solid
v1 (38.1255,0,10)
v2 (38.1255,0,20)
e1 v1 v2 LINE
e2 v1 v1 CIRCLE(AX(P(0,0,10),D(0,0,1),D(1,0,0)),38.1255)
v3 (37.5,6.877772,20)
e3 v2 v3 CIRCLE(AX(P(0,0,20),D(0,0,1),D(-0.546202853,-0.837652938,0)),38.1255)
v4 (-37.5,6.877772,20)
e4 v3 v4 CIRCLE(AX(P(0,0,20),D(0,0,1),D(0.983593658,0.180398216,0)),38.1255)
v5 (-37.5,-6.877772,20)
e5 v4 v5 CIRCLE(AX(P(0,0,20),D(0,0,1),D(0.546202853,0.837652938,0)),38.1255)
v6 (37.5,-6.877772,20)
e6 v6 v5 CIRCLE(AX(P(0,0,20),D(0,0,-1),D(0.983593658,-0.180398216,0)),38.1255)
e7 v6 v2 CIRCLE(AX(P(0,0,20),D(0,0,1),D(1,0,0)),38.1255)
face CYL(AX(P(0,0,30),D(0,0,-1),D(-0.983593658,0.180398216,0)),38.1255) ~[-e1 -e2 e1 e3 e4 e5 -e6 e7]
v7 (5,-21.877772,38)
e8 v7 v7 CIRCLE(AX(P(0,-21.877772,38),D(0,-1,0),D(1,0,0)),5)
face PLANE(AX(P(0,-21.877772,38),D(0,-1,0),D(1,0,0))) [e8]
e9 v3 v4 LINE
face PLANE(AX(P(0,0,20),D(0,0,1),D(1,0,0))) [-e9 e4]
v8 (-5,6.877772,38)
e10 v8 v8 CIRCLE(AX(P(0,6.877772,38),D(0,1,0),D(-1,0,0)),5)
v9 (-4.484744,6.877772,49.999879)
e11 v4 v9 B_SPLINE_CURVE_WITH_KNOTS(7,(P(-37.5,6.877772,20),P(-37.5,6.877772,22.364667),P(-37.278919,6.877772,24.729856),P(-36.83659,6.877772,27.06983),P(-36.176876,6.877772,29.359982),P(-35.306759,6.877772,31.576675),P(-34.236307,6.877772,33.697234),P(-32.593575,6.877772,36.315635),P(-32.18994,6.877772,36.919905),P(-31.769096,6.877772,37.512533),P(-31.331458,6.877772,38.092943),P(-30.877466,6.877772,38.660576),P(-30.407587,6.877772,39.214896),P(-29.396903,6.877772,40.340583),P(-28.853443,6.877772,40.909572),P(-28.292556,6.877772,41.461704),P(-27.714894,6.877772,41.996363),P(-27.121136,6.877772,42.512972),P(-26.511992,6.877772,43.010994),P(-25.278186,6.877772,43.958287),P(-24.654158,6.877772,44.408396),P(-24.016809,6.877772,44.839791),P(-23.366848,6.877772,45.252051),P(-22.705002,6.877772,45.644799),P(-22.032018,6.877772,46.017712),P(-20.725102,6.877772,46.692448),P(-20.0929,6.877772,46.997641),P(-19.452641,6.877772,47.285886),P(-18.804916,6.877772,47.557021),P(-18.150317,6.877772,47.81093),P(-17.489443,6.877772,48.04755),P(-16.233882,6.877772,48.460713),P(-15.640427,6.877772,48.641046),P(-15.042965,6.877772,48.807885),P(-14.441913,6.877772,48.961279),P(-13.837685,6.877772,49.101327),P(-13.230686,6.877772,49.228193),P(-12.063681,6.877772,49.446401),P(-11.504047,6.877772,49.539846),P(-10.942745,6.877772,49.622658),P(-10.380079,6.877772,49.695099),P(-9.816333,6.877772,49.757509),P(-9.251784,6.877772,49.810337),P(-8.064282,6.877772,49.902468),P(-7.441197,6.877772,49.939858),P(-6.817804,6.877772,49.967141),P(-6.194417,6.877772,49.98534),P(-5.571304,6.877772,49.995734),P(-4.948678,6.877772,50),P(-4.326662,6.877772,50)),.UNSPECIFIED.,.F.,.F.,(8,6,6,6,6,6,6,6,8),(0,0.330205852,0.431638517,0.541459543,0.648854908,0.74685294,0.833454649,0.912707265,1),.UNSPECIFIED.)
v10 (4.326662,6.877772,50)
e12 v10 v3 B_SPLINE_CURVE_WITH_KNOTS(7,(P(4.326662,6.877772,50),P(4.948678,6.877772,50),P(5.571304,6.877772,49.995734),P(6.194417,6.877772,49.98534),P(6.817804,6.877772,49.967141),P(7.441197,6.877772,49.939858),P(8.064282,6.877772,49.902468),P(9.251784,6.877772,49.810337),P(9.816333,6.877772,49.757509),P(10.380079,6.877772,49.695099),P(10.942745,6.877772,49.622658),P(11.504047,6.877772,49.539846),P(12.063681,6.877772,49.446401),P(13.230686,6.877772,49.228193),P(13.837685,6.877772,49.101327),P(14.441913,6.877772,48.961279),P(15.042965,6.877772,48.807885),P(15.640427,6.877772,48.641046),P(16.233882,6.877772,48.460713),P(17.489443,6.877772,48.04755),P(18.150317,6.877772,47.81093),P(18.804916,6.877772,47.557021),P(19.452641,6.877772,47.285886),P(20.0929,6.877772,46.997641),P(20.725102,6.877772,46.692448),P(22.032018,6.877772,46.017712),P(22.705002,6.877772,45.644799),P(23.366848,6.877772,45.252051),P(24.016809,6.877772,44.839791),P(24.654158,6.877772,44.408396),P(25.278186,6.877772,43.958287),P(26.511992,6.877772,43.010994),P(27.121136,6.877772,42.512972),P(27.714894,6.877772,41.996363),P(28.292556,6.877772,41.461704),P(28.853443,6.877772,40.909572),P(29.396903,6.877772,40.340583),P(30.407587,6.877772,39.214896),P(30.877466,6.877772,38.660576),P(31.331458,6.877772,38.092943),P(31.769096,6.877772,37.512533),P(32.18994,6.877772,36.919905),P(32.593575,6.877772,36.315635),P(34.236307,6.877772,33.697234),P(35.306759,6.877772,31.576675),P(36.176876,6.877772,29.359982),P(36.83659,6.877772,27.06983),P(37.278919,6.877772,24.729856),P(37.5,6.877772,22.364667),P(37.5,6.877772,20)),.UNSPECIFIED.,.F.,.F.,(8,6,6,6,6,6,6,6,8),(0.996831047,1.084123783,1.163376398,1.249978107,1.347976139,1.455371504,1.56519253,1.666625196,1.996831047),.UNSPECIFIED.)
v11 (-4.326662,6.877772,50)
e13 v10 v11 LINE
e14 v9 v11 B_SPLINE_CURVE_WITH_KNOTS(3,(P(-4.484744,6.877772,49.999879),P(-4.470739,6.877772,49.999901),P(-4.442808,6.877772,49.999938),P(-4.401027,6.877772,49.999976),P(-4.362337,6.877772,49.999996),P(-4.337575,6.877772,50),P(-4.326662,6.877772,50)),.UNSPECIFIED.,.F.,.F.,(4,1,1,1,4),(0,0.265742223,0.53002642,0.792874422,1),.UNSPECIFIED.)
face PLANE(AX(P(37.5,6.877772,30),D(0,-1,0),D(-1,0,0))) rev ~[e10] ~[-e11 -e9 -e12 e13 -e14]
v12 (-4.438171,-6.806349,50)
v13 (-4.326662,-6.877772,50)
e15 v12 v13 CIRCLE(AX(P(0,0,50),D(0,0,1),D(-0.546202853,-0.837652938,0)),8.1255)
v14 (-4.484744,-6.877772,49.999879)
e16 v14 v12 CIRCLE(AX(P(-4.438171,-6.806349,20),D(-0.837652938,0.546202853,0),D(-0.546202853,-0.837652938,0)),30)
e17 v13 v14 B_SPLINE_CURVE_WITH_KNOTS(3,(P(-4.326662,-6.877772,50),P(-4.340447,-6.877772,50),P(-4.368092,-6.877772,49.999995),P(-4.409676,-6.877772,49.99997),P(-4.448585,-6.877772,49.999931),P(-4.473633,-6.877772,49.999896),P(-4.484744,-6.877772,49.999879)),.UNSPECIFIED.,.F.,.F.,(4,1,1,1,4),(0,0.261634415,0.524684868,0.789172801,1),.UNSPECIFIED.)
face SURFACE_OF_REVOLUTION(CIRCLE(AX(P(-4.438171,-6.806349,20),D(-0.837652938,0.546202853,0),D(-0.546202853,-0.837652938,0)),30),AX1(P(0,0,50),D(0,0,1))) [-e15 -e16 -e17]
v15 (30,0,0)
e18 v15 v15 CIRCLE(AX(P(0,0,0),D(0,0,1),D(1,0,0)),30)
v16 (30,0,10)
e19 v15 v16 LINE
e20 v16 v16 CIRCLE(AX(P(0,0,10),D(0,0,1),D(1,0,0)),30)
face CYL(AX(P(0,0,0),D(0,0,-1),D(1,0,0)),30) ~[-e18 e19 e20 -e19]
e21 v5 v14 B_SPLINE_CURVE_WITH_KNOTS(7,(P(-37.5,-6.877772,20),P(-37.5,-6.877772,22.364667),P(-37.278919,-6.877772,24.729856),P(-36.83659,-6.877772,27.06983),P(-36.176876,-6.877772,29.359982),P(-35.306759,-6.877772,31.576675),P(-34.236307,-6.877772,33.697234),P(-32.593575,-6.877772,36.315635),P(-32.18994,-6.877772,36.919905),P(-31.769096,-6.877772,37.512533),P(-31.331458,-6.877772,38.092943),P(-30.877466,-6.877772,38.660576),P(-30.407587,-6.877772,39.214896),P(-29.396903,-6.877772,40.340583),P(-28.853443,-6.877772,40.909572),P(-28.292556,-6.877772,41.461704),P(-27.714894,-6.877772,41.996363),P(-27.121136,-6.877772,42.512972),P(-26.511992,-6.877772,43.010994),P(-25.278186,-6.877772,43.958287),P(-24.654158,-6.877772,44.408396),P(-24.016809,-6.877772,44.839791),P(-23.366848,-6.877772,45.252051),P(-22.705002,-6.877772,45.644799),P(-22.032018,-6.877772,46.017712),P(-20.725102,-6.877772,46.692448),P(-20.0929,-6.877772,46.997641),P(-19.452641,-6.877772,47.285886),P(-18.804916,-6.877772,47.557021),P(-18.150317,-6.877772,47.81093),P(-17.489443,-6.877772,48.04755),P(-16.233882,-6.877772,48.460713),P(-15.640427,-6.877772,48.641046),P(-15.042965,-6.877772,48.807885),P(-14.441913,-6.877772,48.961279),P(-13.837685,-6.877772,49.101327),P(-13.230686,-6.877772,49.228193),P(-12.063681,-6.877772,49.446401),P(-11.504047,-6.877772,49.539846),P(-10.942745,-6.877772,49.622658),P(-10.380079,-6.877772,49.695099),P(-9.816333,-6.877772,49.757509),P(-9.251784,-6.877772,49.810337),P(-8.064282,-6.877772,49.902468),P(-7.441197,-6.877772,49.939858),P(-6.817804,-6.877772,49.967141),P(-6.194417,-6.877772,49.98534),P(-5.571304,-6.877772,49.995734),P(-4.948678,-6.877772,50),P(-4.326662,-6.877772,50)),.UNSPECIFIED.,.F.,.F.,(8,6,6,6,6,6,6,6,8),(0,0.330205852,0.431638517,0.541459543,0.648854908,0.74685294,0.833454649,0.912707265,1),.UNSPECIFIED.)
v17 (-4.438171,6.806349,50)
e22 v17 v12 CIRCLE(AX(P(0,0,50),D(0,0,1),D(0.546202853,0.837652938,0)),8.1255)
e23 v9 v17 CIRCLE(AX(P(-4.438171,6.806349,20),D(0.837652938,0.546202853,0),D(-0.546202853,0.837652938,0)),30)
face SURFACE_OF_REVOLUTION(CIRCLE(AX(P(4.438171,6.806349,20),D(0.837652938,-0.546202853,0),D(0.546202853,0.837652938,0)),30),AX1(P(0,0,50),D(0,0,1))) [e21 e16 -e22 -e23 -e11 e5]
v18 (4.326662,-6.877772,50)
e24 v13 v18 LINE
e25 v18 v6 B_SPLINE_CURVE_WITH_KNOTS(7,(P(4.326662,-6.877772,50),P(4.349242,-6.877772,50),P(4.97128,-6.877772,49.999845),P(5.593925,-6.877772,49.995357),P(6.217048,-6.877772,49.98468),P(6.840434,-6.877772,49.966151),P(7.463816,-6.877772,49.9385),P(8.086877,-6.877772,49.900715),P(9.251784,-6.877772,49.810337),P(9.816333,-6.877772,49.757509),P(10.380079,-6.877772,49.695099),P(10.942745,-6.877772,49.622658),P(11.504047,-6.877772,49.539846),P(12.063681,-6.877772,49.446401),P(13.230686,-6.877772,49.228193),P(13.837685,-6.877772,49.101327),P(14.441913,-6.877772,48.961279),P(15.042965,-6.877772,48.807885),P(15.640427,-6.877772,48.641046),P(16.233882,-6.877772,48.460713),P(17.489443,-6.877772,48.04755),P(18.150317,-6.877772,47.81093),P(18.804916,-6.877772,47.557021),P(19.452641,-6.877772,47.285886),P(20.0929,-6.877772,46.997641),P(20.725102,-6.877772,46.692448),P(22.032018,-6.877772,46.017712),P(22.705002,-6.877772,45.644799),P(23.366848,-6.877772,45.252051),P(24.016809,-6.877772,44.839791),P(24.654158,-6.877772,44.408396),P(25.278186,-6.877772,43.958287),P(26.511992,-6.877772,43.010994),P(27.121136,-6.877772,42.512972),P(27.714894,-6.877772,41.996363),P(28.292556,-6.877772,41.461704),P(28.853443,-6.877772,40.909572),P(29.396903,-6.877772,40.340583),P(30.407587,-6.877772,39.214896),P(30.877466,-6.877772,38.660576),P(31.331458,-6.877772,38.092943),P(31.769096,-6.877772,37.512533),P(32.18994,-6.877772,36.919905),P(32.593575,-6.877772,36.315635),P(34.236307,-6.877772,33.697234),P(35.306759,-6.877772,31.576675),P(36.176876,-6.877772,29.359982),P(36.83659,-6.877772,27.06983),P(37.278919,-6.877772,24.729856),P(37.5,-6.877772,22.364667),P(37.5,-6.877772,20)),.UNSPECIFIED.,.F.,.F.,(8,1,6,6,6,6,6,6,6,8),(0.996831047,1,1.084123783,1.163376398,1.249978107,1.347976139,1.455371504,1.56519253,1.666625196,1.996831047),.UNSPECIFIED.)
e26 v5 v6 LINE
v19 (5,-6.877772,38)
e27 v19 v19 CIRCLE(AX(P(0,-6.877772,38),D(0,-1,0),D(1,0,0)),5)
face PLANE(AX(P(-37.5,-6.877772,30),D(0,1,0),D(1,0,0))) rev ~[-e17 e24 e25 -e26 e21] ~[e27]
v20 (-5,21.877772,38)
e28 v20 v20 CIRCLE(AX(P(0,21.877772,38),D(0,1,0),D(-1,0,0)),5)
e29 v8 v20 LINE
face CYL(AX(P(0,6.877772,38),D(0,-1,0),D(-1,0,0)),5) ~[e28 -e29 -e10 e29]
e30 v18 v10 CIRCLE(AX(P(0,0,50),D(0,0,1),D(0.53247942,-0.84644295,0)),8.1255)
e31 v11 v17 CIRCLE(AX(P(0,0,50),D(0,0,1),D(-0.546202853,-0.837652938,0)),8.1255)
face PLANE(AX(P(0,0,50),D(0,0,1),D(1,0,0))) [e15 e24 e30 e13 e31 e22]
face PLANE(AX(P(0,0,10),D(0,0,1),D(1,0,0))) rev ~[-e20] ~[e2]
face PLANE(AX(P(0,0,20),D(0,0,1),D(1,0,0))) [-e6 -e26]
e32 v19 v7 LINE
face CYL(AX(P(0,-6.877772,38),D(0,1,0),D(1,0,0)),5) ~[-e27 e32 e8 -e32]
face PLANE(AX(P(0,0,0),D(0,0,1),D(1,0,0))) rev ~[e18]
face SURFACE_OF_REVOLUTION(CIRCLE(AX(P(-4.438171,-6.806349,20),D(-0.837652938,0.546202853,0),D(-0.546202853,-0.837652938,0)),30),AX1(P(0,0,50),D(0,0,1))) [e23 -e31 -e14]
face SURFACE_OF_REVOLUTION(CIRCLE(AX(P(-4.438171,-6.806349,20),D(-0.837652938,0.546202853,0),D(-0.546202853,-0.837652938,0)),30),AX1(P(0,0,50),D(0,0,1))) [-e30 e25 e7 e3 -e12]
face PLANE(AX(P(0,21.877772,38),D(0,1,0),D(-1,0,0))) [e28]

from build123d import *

# Parameters (mm, degrees)
F0_R        = 30
F1_DEPTH    = 10
F2_R        = 38.1255
F2_R_2      = 30
F3_DEPTH    = 10
F5_DEPTH    = 10
F7_DEPTH    = 20
F8_T2_ANGLE = 246.2138015041
F8_T4_ANGLE = 246.2138015041
F10_R       = 5
F11_DEPTH   = 15
F9_R        = 5
F12_DEPTH   = 15


# Not quite as in the source:
# - a fillet or chamfer that OpenCascade refuses, or shapes differently, is made with other operations: its cross-section is extruded or revolved along the edge and cut away or added


with BuildPart() as f1:
    # F0 (on Top) → F1 (new body)
    with BuildSketch(Plane.XY):
        Circle(F0_R)
    extrude(amount=F1_DEPTH)

    # F2 (on face) → F3 (join)
    with BuildSketch(Plane.XY.offset(10)):
        Circle(F2_R)
        Circle(F2_R_2, mode=Mode.SUBTRACT)
        Circle(F2_R_2)
    extrude(amount=F3_DEPTH)

    # F4 (on face) → F5 (join)
    with BuildSketch(Plane.XY.offset(20)):
        with BuildLine():
            Line((37.5, 6.8777721865), (-37.5, 6.8777721865))
            ThreePointArc((-37.5, 6.8777721865), (-38.1255, 0), (-37.5, -6.8777721865))
            Line((-37.5, -6.8777721865), (37.5, -6.8777721865))
            ThreePointArc((37.5, -6.8777721865), (37.9688029851, -3.4530783549), (38.1255, 0))
            ThreePointArc((38.1255, 0), (37.9688029851, 3.4530783549), (37.5, 6.8777721865))
        make_face()
    extrude(amount=F5_DEPTH)

    # F6 (on face) → F7 (join)
    with BuildSketch(Plane.XY.offset(30)):
        with BuildLine():
            Line((37.5, 6.8777721865), (-37.5, 6.8777721865))
            ThreePointArc((-37.5, 6.8777721865), (-38.1255, 0), (-37.5, -6.8777721865))
            Line((-37.5, -6.8777721865), (37.5, -6.8777721865))
            ThreePointArc((37.5, -6.8777721865), (38.1255, 0), (37.5, 6.8777721865))
        make_face()
    extrude(amount=F7_DEPTH)

    # F8: fillet of radius 30 on 2 edges, made by hand

    # F8_s1 → F8_t2 (revolve, cut)
    with BuildSketch(Plane(origin=(0, 0, 0), x_dir=(0, 0, 1), z_dir=(-0.8376529376, 0.5462028526, 0))):
        with BuildLine():
            ThreePointArc((20, -38.1255), (41.2132034356, -29.3387034356), (50, -8.1255))
            Line((50, -8.1255), (50, -38.1255))
            Line((50, -38.1255), (20, -38.1255))
        make_face()
    revolve(axis=Axis((0, 0, 50), (0, 0, 1)), revolution_arc=F8_T2_ANGLE, mode=Mode.SUBTRACT)

    # F8_s3 → F8_t4 (revolve, cut)
    with BuildSketch(Plane(origin=(0, 0, 0), x_dir=(0, 0, 1), z_dir=(0.8376529376, -0.5462028526, 0))):
        with BuildLine():
            ThreePointArc((20, -38.1255), (41.2132034356, -29.3387034356), (50, -8.1255))
            Line((50, -8.1255), (50, -38.1255))
            Line((50, -38.1255), (20, -38.1255))
        make_face()
    revolve(axis=Axis((0, 0, 50), (0, 0, 1)), revolution_arc=F8_T4_ANGLE, mode=Mode.SUBTRACT)

    # F10 (on face) → F11 (join)
    with BuildSketch(Plane(origin=(0, 6.8777721865, 0), x_dir=(-1, 0, 0), z_dir=(0, 1, 0))):
        with Locations((0, 38)):
            Circle(F10_R)
    extrude(amount=F11_DEPTH)

    # F9 (on face) → F12 (join)
    with BuildSketch(Plane.XZ.offset(6.8777721865)):
        with Locations((0, 38)):
            Circle(F9_R)
    extrude(amount=F12_DEPTH)


solid = f1.part
